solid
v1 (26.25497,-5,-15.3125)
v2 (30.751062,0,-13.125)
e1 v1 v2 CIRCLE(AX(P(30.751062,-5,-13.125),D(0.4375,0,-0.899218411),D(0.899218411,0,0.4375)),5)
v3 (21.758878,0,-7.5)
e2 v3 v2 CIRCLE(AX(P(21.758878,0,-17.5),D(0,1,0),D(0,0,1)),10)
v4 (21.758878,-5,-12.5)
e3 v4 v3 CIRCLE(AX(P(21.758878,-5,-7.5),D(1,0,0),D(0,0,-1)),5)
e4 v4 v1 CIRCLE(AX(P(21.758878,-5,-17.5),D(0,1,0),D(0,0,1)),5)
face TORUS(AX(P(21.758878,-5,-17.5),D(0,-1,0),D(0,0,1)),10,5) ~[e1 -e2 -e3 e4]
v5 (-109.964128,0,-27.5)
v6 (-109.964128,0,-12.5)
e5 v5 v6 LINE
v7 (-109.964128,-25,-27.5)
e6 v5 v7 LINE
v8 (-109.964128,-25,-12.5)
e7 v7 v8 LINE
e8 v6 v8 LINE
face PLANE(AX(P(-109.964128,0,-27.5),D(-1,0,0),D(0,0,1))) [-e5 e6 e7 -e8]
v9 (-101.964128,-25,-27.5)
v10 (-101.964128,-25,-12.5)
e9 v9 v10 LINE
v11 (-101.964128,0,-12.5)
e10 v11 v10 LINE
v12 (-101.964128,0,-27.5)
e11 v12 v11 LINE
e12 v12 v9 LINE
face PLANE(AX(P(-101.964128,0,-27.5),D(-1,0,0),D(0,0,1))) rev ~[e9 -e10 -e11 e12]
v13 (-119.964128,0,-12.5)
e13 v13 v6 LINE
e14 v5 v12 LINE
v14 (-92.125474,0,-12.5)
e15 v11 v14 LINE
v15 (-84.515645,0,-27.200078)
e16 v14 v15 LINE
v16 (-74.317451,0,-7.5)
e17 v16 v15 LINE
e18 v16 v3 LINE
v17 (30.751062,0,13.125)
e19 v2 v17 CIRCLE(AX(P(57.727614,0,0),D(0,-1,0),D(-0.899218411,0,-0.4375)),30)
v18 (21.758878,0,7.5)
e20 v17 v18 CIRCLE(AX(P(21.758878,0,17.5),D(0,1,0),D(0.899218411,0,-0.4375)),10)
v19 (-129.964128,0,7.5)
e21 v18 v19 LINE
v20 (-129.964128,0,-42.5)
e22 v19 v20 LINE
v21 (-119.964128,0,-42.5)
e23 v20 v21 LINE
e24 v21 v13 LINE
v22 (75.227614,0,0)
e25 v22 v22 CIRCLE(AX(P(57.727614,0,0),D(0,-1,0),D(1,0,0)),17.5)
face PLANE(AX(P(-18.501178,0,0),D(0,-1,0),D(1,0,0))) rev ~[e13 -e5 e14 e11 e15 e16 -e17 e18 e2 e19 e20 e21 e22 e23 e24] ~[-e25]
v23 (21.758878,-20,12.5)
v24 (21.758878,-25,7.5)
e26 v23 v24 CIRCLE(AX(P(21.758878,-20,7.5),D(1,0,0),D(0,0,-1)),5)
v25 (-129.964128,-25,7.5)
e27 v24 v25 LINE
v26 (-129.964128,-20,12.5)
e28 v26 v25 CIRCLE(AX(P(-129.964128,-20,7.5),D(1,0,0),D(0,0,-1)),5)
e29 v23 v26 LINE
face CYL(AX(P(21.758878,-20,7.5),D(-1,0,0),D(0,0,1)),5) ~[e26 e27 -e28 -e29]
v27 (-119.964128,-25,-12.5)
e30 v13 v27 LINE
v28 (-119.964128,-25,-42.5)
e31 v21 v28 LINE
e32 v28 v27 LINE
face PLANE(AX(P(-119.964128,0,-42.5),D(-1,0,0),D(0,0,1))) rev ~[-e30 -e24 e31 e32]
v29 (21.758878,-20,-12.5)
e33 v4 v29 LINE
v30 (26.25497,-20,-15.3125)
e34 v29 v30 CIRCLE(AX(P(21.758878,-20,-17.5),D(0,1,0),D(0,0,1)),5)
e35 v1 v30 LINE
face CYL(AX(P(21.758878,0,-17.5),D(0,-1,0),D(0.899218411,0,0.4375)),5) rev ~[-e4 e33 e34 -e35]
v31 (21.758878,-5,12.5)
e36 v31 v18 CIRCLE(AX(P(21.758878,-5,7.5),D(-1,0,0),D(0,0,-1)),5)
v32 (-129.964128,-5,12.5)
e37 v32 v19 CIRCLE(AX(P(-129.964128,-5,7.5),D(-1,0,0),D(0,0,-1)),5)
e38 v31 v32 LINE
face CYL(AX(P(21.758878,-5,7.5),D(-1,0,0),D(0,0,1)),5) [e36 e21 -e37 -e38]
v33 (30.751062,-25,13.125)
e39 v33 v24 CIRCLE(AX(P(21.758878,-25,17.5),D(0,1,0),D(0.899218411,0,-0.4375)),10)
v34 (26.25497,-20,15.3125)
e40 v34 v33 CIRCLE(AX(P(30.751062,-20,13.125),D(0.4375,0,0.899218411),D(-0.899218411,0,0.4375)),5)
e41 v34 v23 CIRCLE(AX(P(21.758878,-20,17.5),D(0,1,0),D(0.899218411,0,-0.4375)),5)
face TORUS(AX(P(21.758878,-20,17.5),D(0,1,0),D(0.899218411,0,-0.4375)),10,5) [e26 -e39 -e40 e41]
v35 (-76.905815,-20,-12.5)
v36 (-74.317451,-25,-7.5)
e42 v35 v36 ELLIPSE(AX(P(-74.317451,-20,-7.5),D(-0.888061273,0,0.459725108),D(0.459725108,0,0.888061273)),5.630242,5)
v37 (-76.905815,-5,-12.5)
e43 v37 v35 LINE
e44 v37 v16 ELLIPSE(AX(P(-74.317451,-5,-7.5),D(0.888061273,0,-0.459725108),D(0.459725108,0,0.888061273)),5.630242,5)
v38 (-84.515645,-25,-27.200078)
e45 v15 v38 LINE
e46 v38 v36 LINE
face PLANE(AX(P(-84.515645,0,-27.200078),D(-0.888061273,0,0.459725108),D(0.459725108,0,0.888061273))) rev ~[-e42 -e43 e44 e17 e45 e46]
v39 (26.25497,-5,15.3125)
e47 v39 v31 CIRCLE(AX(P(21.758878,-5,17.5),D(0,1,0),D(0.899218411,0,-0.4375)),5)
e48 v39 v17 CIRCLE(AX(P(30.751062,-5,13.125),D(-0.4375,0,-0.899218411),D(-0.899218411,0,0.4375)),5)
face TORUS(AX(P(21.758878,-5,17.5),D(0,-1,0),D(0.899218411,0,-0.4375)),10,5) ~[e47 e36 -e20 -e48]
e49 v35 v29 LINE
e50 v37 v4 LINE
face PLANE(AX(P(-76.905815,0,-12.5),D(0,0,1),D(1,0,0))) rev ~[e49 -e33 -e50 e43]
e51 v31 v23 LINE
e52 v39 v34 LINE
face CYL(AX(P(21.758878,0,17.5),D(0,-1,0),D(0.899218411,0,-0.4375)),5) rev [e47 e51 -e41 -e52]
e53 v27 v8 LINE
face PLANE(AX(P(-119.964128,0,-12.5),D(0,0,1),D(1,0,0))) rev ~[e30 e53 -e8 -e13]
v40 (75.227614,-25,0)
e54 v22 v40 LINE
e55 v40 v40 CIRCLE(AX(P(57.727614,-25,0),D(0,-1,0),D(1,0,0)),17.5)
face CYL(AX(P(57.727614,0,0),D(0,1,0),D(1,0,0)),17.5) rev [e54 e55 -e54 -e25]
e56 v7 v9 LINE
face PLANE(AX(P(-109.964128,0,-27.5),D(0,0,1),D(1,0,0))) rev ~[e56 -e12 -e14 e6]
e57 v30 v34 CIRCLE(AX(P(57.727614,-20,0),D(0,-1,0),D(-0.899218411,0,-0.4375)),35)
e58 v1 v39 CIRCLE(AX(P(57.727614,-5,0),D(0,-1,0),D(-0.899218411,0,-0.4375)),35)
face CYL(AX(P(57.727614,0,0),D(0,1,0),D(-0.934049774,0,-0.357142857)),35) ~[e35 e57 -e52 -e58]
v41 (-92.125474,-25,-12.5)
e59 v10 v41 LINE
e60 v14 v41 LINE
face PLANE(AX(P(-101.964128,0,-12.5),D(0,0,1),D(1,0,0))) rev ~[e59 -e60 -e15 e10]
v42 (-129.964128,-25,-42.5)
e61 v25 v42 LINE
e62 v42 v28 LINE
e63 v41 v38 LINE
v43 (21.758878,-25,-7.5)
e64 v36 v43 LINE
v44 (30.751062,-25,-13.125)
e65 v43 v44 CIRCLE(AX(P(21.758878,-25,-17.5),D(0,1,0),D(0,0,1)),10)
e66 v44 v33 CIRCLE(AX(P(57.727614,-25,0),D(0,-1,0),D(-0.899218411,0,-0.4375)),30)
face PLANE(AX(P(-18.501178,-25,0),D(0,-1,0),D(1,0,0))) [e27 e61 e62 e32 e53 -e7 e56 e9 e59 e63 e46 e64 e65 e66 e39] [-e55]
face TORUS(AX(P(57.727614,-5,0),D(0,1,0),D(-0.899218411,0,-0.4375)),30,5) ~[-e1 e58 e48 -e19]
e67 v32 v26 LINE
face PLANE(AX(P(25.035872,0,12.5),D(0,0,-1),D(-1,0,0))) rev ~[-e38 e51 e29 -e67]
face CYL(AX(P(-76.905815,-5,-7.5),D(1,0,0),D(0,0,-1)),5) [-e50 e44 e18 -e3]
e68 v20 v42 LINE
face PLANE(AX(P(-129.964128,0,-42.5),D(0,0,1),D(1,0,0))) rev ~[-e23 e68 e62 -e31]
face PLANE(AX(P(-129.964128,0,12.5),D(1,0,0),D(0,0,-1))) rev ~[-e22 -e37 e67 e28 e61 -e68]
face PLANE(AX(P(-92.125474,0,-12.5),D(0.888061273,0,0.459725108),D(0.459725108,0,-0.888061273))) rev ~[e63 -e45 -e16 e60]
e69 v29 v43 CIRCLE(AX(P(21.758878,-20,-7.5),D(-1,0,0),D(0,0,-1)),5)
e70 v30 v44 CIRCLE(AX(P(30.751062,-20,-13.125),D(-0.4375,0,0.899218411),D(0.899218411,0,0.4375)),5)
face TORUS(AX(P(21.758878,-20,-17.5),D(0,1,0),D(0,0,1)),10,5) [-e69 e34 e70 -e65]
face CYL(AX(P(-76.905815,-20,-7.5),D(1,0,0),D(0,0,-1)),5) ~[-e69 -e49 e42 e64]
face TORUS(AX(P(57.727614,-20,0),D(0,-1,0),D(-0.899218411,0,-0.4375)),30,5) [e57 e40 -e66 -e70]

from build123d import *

# Parameters (mm, degrees)
F0_R     = 17.5
F0_W     = 10
F0_H     = 30
F0_W_2   = 8
F0_H_2   = 15
F1_DEPTH = 25
F2_F1_R  = 5
F2_F2_R  = 5


with BuildPart() as f1:
    # F0 (on Front) → F1 (new body)
    with BuildSketch(Plane.XZ):
        with BuildLine():
            Line((-76.905815019, -12.5), (25.0358718634, -12.5))
            ThreePointArc((25.0358718634, -12.5), (92.7276139399, 0), (25.0358718634, 12.5))
            Line((25.0358718634, 12.5), (-129.9641281366, 12.5))
            Line((-129.9641281366, 12.5), (-129.9641281366, -12.5))
            Line((-129.9641281366, -12.5), (-119.9641281366, -12.5))
            Line((-119.9641281366, -12.5), (-109.9641281366, -12.5))
            Line((-109.9641281366, -12.5), (-101.9641281366, -12.5))
            Line((-101.9641281366, -12.5), (-92.1254744445, -12.5))
            Line((-92.1254744445, -12.5), (-76.905815019, -12.5))
        make_face()
        with Locations((57.7276139399, 0)):
            Circle(F0_R, mode=Mode.SUBTRACT)
        with Locations((-124.9641281366, -27.5)):
            Rectangle(F0_W, F0_H)
        with Locations((-105.9641281366, -20)):
            Rectangle(F0_W_2, F0_H_2)
        Polygon((-84.5156447317, -27.2000782564), (-76.905815019, -12.5), (-92.1254744445, -12.5), align=None)
    extrude(amount=F1_DEPTH)

    # F2: fillet of radius 5 on 4 edges, made by hand

    # F2_f1
    f2_f1_edges = [f1.edges().sort_by_distance(p)[0] for p in [
        (25.0358718634, -12.5, -12.5),
        (25.0358718634, -12.5, 12.5),
    ]]
    fillet(f2_f1_edges, radius=F2_F1_R)

    # F2_f2
    f2_f2_edges = [f1.edges().sort_by_distance(p)[0] for p in [
        (92.7276139399, 0, 0),
        (92.7276139399, -25, 0),
        (24.4105279445, -25, -13.2610437605),
        (24.4105279445, -25, 13.2610437605),
        (24.4105279445, 0, -13.2610437605),
        (24.4105279445, 0, 13.2610437605),
    ]]
    fillet(f2_f2_edges, radius=F2_F2_R)


solid = f1.part
